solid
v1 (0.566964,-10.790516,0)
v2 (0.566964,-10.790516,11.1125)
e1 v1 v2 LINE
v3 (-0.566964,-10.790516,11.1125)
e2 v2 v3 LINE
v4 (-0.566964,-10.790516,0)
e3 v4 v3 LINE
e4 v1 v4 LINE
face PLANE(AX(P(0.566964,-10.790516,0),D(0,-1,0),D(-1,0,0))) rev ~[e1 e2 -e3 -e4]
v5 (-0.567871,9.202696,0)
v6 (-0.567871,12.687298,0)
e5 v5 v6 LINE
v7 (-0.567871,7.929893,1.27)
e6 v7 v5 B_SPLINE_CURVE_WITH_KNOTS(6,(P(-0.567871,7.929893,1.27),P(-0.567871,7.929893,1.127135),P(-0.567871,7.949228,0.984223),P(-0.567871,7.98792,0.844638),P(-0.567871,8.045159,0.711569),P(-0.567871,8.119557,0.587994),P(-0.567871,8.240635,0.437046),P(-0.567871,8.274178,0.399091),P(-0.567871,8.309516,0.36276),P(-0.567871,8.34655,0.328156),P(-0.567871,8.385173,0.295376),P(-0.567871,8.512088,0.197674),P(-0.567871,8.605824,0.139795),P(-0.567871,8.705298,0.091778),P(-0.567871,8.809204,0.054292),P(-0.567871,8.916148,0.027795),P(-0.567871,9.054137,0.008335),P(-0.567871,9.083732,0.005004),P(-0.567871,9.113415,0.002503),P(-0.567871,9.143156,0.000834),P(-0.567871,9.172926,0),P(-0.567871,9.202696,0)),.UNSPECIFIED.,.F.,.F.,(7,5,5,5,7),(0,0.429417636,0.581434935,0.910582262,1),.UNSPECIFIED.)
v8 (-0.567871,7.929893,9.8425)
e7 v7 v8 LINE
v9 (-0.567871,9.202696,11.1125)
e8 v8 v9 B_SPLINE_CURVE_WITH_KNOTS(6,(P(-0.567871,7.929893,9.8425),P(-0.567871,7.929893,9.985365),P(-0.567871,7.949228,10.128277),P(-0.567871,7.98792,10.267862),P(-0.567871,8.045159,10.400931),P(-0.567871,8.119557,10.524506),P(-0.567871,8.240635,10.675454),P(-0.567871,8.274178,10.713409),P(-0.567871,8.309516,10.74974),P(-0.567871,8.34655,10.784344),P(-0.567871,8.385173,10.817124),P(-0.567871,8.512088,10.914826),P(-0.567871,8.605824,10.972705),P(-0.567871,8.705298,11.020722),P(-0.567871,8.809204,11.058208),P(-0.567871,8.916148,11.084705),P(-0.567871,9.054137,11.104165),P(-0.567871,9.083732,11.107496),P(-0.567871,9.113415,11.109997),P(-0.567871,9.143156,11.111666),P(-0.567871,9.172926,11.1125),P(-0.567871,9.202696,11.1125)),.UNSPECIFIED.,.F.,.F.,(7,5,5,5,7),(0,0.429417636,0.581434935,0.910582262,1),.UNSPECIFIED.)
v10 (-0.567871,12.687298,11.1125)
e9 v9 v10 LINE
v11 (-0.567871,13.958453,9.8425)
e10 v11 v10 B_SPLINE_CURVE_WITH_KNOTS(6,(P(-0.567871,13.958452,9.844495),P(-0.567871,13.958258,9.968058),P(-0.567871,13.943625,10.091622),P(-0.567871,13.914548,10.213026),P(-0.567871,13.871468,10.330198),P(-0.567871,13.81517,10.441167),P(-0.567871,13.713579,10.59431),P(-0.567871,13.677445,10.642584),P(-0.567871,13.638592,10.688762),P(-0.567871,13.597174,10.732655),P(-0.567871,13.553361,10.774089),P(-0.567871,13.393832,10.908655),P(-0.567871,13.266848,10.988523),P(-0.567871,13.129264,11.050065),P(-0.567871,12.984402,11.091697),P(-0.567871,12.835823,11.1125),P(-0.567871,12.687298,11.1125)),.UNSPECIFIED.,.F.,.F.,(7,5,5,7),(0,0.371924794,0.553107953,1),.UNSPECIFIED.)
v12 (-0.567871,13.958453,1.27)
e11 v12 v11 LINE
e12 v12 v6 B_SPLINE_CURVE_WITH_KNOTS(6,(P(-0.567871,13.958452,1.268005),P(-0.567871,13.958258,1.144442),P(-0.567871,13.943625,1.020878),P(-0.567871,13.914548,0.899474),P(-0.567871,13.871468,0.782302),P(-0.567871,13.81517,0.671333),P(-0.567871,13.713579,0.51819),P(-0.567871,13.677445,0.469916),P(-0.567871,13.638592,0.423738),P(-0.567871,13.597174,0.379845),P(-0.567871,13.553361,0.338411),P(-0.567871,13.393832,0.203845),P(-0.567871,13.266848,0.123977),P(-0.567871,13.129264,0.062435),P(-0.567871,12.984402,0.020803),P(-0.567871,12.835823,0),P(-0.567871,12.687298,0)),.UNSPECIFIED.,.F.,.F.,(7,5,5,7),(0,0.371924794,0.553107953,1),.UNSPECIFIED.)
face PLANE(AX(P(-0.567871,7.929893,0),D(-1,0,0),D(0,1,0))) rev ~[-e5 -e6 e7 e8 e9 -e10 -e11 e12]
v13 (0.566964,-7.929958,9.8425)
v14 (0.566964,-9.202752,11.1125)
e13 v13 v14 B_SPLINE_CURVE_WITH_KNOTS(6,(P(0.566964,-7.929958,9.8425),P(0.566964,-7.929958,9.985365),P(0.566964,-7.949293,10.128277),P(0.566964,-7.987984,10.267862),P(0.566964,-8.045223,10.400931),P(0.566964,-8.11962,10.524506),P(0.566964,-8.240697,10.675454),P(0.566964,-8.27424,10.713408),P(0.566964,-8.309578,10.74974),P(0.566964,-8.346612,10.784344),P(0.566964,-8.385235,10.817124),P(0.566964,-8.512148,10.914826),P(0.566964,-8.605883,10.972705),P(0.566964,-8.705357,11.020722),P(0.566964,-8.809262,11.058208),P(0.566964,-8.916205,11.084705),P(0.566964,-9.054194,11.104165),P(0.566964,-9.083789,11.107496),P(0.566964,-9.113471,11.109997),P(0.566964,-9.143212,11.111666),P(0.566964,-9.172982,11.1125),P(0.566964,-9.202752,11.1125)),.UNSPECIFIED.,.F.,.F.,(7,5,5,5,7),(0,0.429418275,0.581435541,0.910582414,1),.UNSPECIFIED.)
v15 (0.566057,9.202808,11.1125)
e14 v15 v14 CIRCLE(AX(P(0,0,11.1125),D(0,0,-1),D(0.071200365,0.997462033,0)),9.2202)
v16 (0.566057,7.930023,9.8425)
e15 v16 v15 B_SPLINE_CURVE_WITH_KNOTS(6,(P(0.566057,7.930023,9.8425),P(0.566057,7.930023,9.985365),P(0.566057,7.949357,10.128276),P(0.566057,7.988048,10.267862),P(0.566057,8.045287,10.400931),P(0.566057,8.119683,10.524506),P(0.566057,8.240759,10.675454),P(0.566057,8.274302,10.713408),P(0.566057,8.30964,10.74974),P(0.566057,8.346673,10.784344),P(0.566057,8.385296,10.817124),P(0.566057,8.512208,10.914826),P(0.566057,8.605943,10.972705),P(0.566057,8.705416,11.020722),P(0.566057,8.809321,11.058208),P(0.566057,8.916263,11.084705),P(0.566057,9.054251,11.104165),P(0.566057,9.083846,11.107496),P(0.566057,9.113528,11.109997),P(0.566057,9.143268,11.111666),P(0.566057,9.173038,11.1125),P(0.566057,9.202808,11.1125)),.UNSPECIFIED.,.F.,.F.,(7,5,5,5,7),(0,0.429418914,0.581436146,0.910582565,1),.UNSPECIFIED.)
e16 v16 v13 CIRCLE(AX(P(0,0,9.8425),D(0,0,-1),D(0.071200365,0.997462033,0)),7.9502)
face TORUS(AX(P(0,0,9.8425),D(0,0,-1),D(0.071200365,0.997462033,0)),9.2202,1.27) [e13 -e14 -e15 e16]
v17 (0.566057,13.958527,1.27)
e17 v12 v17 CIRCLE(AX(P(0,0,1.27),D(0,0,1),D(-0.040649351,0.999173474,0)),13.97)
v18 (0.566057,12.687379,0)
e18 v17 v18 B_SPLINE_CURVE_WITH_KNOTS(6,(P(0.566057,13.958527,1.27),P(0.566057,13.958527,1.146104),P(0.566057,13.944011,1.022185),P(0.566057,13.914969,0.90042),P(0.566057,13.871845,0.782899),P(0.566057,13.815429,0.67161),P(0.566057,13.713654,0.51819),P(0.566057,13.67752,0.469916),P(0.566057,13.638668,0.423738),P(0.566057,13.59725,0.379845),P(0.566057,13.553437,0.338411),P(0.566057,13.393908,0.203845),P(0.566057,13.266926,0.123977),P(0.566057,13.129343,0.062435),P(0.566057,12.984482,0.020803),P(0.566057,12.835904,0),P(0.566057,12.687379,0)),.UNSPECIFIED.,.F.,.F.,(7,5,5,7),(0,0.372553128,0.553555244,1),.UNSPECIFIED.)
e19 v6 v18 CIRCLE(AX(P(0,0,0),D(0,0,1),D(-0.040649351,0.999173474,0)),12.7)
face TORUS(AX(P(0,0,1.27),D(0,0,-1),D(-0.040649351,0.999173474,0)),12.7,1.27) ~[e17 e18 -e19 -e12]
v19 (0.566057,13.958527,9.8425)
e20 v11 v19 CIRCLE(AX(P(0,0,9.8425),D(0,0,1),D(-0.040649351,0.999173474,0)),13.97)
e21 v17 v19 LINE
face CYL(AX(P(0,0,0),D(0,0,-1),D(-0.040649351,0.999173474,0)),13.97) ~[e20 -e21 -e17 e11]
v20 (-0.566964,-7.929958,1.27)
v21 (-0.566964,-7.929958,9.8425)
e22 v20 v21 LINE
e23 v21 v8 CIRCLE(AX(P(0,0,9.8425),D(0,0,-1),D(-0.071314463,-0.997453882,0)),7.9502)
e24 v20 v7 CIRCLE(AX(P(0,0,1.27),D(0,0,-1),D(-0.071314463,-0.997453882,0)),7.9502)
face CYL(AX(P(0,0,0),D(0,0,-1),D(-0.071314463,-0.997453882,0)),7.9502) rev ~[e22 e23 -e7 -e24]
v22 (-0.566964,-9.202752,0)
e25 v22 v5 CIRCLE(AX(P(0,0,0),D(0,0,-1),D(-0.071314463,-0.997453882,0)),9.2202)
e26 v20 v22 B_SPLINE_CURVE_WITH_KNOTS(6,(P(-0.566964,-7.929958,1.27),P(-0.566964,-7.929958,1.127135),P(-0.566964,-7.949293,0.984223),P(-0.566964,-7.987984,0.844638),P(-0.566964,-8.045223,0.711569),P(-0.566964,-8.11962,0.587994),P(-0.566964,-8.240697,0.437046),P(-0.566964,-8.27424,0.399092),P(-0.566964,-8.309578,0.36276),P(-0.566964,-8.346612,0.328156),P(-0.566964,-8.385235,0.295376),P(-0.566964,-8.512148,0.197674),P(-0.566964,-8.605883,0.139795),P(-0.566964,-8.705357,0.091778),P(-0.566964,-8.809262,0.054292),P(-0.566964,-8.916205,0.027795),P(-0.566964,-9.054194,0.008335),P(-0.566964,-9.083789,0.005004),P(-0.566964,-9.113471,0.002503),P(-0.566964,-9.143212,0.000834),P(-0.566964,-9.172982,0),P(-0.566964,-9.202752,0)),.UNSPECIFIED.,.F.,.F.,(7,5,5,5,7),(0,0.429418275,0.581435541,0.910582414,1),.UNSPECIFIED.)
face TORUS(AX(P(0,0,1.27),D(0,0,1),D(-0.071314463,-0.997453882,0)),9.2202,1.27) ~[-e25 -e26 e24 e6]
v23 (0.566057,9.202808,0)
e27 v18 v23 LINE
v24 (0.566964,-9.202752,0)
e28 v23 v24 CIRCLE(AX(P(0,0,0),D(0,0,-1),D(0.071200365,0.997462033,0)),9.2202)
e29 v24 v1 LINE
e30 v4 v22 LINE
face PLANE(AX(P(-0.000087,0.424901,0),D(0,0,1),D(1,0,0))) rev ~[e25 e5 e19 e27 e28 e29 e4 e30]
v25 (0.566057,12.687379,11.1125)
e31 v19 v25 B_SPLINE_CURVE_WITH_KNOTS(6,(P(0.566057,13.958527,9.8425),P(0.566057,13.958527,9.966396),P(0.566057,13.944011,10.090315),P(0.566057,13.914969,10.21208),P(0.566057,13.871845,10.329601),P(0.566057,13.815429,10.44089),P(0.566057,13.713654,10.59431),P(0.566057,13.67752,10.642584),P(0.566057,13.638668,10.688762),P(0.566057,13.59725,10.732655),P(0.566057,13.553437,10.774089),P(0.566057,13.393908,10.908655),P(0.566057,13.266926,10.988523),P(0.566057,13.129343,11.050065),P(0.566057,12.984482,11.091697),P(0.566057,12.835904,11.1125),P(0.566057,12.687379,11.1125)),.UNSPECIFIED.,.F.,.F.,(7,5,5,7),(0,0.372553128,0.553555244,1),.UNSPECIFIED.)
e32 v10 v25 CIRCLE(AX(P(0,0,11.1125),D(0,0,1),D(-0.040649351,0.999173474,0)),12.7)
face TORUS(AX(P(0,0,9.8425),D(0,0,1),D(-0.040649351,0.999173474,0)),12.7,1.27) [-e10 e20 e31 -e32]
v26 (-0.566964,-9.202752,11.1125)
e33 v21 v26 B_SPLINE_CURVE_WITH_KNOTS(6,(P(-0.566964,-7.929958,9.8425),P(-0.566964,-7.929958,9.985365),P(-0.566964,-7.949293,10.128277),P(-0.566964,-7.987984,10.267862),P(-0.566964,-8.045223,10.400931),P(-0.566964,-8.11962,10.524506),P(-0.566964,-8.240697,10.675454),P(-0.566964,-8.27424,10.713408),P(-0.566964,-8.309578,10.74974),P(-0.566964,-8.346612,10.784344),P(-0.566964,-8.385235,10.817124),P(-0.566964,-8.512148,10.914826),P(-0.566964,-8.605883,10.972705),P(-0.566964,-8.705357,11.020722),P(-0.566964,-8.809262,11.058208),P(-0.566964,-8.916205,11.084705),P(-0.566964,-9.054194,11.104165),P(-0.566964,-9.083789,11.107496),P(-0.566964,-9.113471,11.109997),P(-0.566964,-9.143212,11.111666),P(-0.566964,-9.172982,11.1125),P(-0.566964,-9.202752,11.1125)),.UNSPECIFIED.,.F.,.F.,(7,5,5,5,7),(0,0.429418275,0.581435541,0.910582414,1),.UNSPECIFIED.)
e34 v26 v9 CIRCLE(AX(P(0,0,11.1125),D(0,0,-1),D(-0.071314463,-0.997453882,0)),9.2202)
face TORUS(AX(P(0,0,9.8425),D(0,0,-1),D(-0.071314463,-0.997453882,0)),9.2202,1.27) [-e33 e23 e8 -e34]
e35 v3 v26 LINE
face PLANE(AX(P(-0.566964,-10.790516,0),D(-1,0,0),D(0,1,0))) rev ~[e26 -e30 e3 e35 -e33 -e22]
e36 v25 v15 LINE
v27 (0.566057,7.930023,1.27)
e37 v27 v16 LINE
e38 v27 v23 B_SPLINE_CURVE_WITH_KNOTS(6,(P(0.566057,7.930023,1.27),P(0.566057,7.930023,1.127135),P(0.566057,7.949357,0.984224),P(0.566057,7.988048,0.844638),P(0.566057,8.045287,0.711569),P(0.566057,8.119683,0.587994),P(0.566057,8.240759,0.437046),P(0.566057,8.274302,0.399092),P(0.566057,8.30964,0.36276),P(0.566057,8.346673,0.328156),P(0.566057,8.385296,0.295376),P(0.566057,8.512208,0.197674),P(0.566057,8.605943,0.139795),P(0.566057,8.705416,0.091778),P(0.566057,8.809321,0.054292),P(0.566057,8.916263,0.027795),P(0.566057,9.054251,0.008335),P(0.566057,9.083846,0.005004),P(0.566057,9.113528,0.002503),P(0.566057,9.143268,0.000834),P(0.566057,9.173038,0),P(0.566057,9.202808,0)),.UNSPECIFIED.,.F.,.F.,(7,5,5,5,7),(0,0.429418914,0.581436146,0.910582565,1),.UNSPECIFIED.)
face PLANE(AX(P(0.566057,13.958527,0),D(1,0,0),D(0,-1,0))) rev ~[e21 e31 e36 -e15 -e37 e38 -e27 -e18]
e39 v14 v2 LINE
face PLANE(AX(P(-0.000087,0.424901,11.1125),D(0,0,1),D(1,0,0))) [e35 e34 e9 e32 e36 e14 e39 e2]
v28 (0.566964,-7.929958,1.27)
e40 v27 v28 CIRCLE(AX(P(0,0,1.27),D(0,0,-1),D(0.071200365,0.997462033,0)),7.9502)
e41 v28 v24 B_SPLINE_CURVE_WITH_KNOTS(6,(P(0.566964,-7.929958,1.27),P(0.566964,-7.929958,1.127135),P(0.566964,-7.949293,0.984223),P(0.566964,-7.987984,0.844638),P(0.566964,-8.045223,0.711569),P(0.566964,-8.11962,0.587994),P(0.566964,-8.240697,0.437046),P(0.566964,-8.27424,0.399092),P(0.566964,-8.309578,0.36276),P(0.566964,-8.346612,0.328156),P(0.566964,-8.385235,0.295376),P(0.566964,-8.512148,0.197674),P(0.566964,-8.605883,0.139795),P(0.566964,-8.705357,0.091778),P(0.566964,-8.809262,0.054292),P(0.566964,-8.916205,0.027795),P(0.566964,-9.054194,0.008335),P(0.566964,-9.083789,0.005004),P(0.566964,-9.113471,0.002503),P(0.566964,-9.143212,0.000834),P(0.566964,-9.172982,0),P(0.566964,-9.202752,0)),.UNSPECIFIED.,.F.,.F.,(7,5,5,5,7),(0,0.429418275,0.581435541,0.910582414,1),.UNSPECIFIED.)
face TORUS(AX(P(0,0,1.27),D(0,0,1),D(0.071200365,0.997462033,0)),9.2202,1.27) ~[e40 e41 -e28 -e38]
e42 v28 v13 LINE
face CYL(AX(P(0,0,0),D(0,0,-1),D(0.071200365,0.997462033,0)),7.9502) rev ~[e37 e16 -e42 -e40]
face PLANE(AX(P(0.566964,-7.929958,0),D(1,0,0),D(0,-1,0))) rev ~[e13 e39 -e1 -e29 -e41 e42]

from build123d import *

# Parameters (mm, degrees)
F1_DEPTH = 11.1125
F2_R     = 1.27


# Not quite as in the source:
# - a feature names something its author has since deleted; it is built from what else it names


with BuildPart() as f1:
    # F0 (on Top) → F1 (new body)
    with BuildSketch(Plane.XY):
        with BuildLine():
            Line((0.5669642458, -7.9299578551), (0.5669642458, -10.7905164226))
            Line((0.5669642458, -10.7905164226), (-0.5669642458, -10.7905164226))
            Line((-0.5669642458, -10.7905164226), (-0.5669642458, -7.9299578551))
            ThreePointArc((-0.5669642458, -7.9299578551), (-7.950199987, -0.0004547511), (-0.5678714286, 7.9298929426))
            Line((-0.5678714286, 7.9298929426), (-0.5678714286, 13.9584534258))
            ThreePointArc((-0.5678714286, 13.9584534258), (0.0009078918, -13.9699999705), (0.566057141, 13.9585271183))
            Line((0.566057141, 13.9585271183), (0.566057141, 7.9300226578))
            ThreePointArc((0.566057141, 7.9300226578), (7.950199987, 0.0004547083), (0.5669642458, -7.9299578551))
        make_face()
    extrude(amount=F1_DEPTH)

    # F2
    f2_edges = [f1.edges().sort_by_distance(p)[0] for p in [
        (-7.9502, -0.000455, 11.1125),
        (-7.9502, -0.000455, 0),
        (0.000908, -13.97, 11.1125),
        (0.000908, -13.97, 0),
        (7.9502, 0.000455, 11.1125),
        (7.9502, 0.000455, 0),
    ]]
    fillet(f2_edges, radius=F2_R)


solid = f1.part
